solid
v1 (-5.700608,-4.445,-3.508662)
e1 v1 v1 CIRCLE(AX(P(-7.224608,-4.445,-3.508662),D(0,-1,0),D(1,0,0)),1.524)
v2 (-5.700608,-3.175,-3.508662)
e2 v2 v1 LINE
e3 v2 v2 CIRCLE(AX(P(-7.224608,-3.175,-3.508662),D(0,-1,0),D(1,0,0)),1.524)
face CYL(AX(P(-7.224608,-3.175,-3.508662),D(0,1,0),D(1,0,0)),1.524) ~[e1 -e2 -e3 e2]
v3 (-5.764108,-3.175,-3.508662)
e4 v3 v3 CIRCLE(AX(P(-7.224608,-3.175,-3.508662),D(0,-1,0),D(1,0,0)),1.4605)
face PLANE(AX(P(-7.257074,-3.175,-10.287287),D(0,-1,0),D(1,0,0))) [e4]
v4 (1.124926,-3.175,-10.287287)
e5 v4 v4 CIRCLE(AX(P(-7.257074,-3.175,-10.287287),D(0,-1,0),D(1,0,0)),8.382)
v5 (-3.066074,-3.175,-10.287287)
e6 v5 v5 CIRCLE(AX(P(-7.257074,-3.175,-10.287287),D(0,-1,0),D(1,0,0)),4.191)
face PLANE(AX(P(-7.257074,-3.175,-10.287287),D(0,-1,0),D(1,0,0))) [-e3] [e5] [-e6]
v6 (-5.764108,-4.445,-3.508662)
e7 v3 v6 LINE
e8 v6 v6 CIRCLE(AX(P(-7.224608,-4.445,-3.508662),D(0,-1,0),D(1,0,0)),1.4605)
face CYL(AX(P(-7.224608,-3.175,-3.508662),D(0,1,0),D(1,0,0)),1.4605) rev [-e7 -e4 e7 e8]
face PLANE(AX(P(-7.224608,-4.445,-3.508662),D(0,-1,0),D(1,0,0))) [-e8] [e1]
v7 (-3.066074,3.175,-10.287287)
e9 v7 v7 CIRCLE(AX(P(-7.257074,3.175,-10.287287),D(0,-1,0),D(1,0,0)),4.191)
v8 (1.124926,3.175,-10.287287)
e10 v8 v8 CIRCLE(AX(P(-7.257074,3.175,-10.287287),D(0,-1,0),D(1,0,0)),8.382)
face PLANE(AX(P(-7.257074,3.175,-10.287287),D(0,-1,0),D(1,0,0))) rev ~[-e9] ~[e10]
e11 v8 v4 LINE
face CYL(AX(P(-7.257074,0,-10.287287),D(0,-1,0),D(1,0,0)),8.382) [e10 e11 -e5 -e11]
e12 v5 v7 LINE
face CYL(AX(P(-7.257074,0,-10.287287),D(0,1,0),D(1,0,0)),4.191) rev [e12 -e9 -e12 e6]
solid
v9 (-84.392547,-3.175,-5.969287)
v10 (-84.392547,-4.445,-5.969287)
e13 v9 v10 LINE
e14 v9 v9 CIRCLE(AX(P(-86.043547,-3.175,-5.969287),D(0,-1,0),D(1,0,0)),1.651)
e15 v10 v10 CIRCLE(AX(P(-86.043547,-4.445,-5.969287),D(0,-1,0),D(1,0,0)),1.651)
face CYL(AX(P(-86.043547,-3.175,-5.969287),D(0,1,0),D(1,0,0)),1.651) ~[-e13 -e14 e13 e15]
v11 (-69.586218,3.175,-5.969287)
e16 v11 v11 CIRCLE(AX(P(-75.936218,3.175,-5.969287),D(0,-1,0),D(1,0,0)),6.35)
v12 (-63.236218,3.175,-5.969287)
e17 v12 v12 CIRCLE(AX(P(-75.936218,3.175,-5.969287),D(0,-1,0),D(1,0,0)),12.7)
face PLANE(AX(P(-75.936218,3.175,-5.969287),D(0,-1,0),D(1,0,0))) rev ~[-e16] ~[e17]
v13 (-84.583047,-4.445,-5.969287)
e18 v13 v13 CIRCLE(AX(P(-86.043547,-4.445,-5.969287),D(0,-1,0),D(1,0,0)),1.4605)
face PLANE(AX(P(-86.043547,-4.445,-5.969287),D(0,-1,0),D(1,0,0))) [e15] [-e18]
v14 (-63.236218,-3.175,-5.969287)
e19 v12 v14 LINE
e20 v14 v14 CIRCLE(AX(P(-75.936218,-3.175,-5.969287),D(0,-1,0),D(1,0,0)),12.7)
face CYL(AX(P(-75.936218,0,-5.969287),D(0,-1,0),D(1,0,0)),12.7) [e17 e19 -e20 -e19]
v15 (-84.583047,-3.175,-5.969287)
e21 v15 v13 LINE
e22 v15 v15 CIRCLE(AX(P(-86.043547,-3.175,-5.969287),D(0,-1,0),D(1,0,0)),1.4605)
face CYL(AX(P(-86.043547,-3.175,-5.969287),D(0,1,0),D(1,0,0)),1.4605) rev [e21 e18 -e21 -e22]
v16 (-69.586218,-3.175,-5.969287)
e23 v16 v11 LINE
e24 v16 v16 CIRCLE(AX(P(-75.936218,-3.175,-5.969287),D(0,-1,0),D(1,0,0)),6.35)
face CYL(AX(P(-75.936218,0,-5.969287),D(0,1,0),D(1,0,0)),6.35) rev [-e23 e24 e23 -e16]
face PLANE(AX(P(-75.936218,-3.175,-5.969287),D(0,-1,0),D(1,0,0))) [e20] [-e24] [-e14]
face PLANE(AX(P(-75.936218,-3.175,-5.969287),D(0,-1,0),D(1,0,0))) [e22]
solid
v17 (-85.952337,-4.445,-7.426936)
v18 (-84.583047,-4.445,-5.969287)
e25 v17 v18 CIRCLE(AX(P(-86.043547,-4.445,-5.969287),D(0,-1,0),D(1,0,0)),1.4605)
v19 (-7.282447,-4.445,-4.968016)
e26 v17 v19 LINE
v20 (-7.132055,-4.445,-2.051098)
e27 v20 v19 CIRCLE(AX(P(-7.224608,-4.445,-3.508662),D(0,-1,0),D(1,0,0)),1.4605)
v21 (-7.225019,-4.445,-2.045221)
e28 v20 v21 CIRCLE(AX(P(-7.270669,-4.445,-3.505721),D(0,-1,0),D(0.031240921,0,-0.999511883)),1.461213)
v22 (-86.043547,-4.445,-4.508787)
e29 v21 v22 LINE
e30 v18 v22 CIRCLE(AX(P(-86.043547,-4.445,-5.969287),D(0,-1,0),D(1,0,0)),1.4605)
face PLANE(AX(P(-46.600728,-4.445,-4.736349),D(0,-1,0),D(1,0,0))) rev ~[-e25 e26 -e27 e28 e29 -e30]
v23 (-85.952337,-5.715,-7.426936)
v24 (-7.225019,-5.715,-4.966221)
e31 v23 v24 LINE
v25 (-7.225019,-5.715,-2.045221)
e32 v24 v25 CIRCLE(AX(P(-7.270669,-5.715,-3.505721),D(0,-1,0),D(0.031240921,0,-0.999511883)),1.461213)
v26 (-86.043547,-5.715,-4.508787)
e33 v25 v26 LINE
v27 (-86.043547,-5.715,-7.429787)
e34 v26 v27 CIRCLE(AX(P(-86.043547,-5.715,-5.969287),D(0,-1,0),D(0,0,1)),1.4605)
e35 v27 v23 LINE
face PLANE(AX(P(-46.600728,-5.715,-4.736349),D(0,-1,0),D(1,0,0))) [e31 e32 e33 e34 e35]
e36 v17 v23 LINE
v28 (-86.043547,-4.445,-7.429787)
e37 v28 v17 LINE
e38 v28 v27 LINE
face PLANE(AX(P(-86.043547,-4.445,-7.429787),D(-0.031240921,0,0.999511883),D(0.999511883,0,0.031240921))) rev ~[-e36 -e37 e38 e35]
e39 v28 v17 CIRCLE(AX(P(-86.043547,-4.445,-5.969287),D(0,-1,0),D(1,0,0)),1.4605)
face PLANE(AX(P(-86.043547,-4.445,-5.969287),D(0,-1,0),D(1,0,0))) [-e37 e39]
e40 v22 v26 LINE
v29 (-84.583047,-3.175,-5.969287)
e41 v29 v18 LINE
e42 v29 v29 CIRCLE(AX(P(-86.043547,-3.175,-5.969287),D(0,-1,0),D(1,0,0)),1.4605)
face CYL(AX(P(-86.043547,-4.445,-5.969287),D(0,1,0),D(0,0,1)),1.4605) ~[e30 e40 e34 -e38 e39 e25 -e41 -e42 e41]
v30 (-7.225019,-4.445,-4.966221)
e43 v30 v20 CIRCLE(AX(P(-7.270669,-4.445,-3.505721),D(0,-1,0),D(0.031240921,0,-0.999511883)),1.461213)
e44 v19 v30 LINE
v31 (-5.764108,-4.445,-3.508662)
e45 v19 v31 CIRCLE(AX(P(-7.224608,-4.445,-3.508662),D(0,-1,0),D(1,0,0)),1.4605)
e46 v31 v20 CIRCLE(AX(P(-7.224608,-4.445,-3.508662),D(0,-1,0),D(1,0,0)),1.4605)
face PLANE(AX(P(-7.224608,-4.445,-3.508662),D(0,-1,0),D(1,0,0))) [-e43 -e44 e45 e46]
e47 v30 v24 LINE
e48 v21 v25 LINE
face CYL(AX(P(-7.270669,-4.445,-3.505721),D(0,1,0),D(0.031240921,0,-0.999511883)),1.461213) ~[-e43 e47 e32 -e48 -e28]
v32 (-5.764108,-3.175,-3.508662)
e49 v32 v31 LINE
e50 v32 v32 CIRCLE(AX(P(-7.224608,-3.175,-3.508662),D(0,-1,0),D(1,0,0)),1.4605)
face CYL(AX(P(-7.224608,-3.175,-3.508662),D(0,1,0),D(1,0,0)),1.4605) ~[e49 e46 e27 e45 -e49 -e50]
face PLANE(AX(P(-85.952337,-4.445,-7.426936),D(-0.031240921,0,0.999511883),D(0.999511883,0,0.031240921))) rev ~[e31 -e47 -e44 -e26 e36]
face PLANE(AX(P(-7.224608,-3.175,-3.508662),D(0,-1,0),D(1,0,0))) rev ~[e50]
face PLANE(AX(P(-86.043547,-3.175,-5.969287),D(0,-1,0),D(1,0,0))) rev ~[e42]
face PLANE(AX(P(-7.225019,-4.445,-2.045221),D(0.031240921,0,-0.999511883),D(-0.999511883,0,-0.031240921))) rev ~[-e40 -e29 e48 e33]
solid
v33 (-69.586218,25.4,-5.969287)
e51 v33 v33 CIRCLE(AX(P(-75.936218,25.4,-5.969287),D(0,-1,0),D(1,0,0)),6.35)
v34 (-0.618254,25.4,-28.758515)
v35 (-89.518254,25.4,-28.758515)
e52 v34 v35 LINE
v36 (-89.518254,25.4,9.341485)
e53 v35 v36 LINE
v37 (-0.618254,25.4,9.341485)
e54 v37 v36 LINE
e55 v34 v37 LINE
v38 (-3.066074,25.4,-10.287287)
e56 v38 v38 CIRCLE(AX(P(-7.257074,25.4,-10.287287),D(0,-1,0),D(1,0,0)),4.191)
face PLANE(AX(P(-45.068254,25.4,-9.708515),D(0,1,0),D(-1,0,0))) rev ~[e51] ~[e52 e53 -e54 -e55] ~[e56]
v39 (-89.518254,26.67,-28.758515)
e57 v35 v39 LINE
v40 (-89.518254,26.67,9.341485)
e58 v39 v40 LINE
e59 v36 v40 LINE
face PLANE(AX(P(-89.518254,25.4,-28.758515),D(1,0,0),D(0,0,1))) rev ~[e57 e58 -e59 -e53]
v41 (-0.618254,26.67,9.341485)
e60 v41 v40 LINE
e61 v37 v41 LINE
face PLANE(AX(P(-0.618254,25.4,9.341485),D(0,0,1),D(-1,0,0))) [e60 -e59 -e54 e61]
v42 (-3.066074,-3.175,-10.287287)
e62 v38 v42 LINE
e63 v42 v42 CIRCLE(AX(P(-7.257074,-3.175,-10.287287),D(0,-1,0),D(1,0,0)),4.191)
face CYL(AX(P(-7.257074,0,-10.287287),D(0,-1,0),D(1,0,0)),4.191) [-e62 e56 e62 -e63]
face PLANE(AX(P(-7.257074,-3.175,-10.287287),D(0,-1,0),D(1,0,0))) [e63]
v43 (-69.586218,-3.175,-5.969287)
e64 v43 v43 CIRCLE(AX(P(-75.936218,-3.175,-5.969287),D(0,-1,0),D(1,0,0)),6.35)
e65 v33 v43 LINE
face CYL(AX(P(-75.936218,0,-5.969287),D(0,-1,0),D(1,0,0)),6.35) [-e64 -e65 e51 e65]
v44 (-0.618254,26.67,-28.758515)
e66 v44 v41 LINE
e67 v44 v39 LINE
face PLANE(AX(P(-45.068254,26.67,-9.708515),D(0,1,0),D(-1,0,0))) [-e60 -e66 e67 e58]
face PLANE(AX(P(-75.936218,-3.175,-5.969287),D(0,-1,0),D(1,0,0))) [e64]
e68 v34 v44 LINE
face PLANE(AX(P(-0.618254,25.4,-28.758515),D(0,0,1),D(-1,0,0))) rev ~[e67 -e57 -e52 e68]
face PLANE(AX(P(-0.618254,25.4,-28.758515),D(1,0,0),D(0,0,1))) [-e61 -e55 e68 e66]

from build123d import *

# Parameters (mm, degrees)
F0_R          = 12.7
F0_R_2        = 6.35
F1_DEPTH      = 3.175
F0_R_3        = 8.382
F0_R_4        = 4.191
F2_DEPTH      = 25.4
F2_DEPTH_BACK = 3.175
F3_W          = 88.9
F3_H          = 38.1
F3_R          = 4.191
F4_DEPTH      = 1.27
F5_R          = 1.4605
F6_DEPTH      = 1.27
F5_R_2        = 1.651
F8_DEPTH      = 1.27
F5_R_3        = 1.524
F9_DEPTH      = 1.27
F10_DEPTH     = 1.27


with BuildPart() as f1:
    # F0 (on Front) → F1 (new body, symmetric)
    with BuildSketch(Plane.XZ):
        with Locations((-75.936218357, -5.9692873619)):
            Circle(F0_R)
        with Locations((-75.936218357, -5.9692873619)):
            Circle(F0_R_2, mode=Mode.SUBTRACT)
    extrude(amount=F1_DEPTH, both=True)

    # F5 (on face) → F8 (join)
    with BuildSketch(Plane.XZ.offset(3.175)):
        with Locations((-86.0435470144, -5.9692873619)):
            Circle(F5_R_2)
        with Locations((-86.0435470144, -5.9692873619)):
            Circle(F5_R, mode=Mode.SUBTRACT)
    extrude(amount=F8_DEPTH)


with BuildPart() as f1b:
    # F0 (on Front) → F1, piece 2 (new body, symmetric)
    with BuildSketch(Plane.XZ):
        with Locations((-7.2570741824, -10.2872873619)):
            Circle(F0_R_3)
        with Locations((-7.2570741824, -10.2872873619)):
            Circle(F0_R_4, mode=Mode.SUBTRACT)
    extrude(amount=F1_DEPTH, both=True)

    # F5 (on face) → F9 (join)
    with BuildSketch(Plane.XZ.offset(3.175)):
        with Locations((-7.2246077433, -3.5086621135)):
            Circle(F5_R_3)
        with Locations((-7.2246077433, -3.5086621135)):
            Circle(F5_R, mode=Mode.SUBTRACT)
    extrude(amount=F9_DEPTH)


with BuildPart() as f2:
    # F0 (on Front) → F2 (new body, two sides)
    with BuildSketch(Plane.XZ) as f2_sk:
        with Locations((-75.936218357, -5.9692873619)):
            Circle(F0_R_2)
    extrude(amount=-F2_DEPTH)
    extrude(f2_sk.sketch, amount=F2_DEPTH_BACK)



with BuildPart() as f2b:
    # F0 (on Front) → F2, piece 2 (new body, two sides)
    with BuildSketch(Plane.XZ) as f2_2_sk:
        with Locations((-7.2570741824, -10.2872873619)):
            Circle(F0_R_4)
    extrude(amount=-F2_DEPTH)
    extrude(f2_2_sk.sketch, amount=F2_DEPTH_BACK)


with BuildPart() as f2_1:
    add(f2.part)

    add(f2b.part)  # F4 merges F2b
    # F3 (on face) → F4 (join)
    with BuildSketch(Plane(origin=(0, 25.4, 0), x_dir=(-1, 0, 0), z_dir=(0, 1, 0))):
        with Locations((45.0682541123, -9.7085153395)):
            Rectangle(F3_W, F3_H)
        with Locations((7.2570741824, -10.2872873619)):
            Circle(F3_R, mode=Mode.SUBTRACT)
        with Locations((7.2570741824, -10.2872873619)):
            Circle(F3_R)
    extrude(amount=F4_DEPTH)


with BuildPart() as f6:
    # F5 (on face) → F6 (new body)
    with BuildSketch(Plane.XZ.offset(3.175)):
        with Locations((-86.0435470144, -5.9692873619)):
            Circle(F5_R)
    extrude(amount=F6_DEPTH)



with BuildPart() as f6b:
    # F5 (on face) → F6, piece 2 (new body)
    with BuildSketch(Plane.XZ.offset(3.175)):
        with Locations((-7.2246077433, -3.5086621135)):
            Circle(F5_R)
    extrude(amount=F6_DEPTH)


with BuildPart() as f6_1:
    add(f6.part)

    add(f6b.part)  # F10 merges F6b
    # F7 (on face) → F10 (join)
    with BuildSketch(Plane.XZ.offset(4.445)):
        with BuildLine():
            Line((-7.2250190292, -2.0452214296), (-86.0435470144, -4.5087873619))
            ThreePointArc((-86.0435470144, -4.5087873619), (-85.0108175605, -4.936557908), (-84.5830470144, -5.9692873619))
            ThreePointArc((-84.5830470144, -5.9692873619), (-84.9790582334, -6.9692493038), (-85.9523368264, -7.4269364801))
            Line((-85.9523368264, -7.4269364801), (-7.2250190292, -4.9662214296))
            ThreePointArc((-7.2250190292, -4.9662214296), (-5.8094554344, -3.5057214296), (-7.2250190292, -2.0452214296))
        make_face()
        with BuildLine():
            ThreePointArc((-84.5830470144, -5.9692873619), (-85.0108175605, -4.936557908), (-86.0435470144, -4.5087873619))
            ThreePointArc((-86.0435470144, -4.5087873619), (-87.5040470144, -5.9692873619), (-86.0435470144, -7.4297873619))
            Line((-86.0435470144, -7.4297873619), (-85.9523368264, -7.4269364801))
            ThreePointArc((-85.9523368264, -7.4269364801), (-84.9790582334, -6.9692493038), (-84.5830470144, -5.9692873619))
        make_face()
    extrude(amount=F10_DEPTH)


solid = Compound([f1.part, f1b.part, f2_1.part, f6_1.part])
